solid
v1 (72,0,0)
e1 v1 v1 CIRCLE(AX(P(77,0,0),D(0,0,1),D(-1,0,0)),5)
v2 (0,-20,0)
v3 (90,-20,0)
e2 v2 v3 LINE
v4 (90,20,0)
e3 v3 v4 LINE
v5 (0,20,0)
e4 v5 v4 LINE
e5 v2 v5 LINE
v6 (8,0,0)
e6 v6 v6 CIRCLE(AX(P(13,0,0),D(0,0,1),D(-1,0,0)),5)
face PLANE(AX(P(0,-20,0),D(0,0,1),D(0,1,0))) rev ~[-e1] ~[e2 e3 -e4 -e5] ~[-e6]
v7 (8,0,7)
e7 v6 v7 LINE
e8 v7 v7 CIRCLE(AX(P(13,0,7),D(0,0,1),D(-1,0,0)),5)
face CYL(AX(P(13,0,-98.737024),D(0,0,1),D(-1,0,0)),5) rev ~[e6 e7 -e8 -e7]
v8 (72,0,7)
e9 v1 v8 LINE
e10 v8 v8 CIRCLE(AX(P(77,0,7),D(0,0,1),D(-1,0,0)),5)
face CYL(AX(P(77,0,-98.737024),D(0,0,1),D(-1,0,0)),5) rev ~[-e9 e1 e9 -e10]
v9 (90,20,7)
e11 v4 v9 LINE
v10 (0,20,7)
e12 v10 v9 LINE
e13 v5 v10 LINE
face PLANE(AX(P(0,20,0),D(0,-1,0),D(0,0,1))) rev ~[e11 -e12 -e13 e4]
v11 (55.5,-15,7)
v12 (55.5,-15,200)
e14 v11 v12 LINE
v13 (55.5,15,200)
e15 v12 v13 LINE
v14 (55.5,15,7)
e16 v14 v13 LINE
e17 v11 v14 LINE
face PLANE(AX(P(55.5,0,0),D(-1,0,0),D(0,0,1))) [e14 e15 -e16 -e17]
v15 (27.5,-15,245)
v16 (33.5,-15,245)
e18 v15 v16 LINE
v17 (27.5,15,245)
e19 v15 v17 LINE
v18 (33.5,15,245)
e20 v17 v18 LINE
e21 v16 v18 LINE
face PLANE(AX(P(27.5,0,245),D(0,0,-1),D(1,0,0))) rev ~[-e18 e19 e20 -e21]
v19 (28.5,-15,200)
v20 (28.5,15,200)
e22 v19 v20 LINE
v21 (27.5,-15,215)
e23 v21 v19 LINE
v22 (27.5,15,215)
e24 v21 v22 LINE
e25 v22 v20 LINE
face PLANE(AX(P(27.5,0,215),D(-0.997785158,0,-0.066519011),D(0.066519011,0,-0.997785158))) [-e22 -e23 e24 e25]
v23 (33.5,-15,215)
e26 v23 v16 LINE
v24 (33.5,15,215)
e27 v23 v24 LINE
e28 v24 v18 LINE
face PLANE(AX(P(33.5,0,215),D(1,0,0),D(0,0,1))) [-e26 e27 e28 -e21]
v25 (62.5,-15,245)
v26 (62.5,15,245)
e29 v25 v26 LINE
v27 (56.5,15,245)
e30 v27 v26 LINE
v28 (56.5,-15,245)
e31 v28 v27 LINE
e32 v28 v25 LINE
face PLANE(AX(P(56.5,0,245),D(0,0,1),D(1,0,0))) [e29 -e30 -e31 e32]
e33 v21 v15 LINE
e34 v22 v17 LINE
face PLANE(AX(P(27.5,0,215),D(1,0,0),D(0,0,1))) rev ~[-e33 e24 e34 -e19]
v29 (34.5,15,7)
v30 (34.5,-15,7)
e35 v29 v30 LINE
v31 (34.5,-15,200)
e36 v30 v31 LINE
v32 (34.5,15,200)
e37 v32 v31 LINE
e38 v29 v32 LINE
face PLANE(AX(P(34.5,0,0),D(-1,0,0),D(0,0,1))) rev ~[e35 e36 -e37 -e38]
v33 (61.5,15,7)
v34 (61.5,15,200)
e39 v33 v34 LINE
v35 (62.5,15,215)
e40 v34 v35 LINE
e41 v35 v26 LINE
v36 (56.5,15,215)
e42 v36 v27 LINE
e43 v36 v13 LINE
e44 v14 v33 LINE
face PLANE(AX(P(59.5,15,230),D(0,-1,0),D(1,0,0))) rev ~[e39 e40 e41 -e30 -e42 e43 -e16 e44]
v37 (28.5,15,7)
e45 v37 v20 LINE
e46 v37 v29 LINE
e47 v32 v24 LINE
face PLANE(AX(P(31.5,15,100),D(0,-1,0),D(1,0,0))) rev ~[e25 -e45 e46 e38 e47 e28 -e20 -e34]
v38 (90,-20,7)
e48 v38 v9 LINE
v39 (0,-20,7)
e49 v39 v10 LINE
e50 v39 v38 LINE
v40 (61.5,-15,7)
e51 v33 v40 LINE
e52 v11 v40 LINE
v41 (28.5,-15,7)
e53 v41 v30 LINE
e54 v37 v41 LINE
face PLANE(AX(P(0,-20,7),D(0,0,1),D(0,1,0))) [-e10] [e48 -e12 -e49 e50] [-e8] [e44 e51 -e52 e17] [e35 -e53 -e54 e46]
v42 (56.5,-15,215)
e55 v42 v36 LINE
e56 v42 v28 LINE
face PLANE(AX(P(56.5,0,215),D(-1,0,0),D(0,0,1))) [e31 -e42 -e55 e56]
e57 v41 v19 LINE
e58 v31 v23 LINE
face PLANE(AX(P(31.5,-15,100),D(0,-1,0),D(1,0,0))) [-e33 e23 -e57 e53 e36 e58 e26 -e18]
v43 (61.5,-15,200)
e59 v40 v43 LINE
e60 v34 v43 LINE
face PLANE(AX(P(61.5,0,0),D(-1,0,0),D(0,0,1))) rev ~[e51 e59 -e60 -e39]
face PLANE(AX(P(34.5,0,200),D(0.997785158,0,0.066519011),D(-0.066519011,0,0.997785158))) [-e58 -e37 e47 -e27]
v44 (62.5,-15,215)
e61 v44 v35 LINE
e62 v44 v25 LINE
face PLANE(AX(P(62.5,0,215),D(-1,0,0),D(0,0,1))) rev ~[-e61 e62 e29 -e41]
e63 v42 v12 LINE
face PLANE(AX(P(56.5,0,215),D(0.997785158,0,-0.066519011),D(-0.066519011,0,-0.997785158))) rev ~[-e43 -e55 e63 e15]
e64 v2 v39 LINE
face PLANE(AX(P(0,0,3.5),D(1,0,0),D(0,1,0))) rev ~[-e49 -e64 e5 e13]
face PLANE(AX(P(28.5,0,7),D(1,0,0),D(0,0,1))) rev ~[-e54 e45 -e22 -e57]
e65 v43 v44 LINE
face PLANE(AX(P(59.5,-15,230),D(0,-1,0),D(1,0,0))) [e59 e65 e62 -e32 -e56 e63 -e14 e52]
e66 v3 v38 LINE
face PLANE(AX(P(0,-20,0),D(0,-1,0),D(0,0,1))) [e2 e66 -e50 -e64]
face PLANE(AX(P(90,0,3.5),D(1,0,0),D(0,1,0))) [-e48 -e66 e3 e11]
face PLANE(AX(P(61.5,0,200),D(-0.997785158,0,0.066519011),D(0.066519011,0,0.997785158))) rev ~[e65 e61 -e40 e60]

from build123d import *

# Parameters (mm, degrees)
F0_W     = 40
F0_H     = 7
F1_DEPTH = 90
F4_D     = 10
F5_W     = 6
F5_H     = 30
F5_H_2   = 200
F6_DEPTH = 15
F7_DEPTH = 15


# Not quite as in the source:
# - a feature names something its author has since deleted; it is built from what else it names


with BuildPart() as f1:
    # F0 (on Right) → F1 (new body)
    with BuildSketch(Plane.YZ):
        with Locations((0, 3.5)):
            Rectangle(F0_W, F0_H)
    extrude(amount=F1_DEPTH)

    # F4 (through all)
    with Locations(Plane(origin=(0, 0, 0), x_dir=(1, 0, 0), z_dir=(0, 0, -1))):
        with Locations((13, 0), (77, 0)):
            Hole(F4_D / 2)

    # F5 (on Front) → F6 (join)
    with BuildSketch(Plane.XZ):
        with Locations((59.5, 230)):
            Rectangle(F5_W, F5_H)
        Polygon((56.5, 215), (55.5, 200), (61.5, 200), (62.5, 215), align=None)
        with Locations((58.5, 100)):
            Rectangle(F5_W, F5_H_2)
        with Locations((31.5, 100)):
            Rectangle(F5_W, F5_H_2)
        Polygon((27.5, 215), (28.5, 200), (34.5, 200), (33.5, 215), align=None)
        with Locations((30.5, 230)):
            Rectangle(F5_W, F5_H)
    extrude(amount=F6_DEPTH)

    # F7 (add): faces of the model
    f7_faces = [f1.faces().sort_by_distance(p)[0] for p in [
        (31.3424369748, 0, 126),
        (58.6575630252, 0, 126),
    ]]
    extrude(f7_faces, amount=F7_DEPTH)


solid = f1.part
